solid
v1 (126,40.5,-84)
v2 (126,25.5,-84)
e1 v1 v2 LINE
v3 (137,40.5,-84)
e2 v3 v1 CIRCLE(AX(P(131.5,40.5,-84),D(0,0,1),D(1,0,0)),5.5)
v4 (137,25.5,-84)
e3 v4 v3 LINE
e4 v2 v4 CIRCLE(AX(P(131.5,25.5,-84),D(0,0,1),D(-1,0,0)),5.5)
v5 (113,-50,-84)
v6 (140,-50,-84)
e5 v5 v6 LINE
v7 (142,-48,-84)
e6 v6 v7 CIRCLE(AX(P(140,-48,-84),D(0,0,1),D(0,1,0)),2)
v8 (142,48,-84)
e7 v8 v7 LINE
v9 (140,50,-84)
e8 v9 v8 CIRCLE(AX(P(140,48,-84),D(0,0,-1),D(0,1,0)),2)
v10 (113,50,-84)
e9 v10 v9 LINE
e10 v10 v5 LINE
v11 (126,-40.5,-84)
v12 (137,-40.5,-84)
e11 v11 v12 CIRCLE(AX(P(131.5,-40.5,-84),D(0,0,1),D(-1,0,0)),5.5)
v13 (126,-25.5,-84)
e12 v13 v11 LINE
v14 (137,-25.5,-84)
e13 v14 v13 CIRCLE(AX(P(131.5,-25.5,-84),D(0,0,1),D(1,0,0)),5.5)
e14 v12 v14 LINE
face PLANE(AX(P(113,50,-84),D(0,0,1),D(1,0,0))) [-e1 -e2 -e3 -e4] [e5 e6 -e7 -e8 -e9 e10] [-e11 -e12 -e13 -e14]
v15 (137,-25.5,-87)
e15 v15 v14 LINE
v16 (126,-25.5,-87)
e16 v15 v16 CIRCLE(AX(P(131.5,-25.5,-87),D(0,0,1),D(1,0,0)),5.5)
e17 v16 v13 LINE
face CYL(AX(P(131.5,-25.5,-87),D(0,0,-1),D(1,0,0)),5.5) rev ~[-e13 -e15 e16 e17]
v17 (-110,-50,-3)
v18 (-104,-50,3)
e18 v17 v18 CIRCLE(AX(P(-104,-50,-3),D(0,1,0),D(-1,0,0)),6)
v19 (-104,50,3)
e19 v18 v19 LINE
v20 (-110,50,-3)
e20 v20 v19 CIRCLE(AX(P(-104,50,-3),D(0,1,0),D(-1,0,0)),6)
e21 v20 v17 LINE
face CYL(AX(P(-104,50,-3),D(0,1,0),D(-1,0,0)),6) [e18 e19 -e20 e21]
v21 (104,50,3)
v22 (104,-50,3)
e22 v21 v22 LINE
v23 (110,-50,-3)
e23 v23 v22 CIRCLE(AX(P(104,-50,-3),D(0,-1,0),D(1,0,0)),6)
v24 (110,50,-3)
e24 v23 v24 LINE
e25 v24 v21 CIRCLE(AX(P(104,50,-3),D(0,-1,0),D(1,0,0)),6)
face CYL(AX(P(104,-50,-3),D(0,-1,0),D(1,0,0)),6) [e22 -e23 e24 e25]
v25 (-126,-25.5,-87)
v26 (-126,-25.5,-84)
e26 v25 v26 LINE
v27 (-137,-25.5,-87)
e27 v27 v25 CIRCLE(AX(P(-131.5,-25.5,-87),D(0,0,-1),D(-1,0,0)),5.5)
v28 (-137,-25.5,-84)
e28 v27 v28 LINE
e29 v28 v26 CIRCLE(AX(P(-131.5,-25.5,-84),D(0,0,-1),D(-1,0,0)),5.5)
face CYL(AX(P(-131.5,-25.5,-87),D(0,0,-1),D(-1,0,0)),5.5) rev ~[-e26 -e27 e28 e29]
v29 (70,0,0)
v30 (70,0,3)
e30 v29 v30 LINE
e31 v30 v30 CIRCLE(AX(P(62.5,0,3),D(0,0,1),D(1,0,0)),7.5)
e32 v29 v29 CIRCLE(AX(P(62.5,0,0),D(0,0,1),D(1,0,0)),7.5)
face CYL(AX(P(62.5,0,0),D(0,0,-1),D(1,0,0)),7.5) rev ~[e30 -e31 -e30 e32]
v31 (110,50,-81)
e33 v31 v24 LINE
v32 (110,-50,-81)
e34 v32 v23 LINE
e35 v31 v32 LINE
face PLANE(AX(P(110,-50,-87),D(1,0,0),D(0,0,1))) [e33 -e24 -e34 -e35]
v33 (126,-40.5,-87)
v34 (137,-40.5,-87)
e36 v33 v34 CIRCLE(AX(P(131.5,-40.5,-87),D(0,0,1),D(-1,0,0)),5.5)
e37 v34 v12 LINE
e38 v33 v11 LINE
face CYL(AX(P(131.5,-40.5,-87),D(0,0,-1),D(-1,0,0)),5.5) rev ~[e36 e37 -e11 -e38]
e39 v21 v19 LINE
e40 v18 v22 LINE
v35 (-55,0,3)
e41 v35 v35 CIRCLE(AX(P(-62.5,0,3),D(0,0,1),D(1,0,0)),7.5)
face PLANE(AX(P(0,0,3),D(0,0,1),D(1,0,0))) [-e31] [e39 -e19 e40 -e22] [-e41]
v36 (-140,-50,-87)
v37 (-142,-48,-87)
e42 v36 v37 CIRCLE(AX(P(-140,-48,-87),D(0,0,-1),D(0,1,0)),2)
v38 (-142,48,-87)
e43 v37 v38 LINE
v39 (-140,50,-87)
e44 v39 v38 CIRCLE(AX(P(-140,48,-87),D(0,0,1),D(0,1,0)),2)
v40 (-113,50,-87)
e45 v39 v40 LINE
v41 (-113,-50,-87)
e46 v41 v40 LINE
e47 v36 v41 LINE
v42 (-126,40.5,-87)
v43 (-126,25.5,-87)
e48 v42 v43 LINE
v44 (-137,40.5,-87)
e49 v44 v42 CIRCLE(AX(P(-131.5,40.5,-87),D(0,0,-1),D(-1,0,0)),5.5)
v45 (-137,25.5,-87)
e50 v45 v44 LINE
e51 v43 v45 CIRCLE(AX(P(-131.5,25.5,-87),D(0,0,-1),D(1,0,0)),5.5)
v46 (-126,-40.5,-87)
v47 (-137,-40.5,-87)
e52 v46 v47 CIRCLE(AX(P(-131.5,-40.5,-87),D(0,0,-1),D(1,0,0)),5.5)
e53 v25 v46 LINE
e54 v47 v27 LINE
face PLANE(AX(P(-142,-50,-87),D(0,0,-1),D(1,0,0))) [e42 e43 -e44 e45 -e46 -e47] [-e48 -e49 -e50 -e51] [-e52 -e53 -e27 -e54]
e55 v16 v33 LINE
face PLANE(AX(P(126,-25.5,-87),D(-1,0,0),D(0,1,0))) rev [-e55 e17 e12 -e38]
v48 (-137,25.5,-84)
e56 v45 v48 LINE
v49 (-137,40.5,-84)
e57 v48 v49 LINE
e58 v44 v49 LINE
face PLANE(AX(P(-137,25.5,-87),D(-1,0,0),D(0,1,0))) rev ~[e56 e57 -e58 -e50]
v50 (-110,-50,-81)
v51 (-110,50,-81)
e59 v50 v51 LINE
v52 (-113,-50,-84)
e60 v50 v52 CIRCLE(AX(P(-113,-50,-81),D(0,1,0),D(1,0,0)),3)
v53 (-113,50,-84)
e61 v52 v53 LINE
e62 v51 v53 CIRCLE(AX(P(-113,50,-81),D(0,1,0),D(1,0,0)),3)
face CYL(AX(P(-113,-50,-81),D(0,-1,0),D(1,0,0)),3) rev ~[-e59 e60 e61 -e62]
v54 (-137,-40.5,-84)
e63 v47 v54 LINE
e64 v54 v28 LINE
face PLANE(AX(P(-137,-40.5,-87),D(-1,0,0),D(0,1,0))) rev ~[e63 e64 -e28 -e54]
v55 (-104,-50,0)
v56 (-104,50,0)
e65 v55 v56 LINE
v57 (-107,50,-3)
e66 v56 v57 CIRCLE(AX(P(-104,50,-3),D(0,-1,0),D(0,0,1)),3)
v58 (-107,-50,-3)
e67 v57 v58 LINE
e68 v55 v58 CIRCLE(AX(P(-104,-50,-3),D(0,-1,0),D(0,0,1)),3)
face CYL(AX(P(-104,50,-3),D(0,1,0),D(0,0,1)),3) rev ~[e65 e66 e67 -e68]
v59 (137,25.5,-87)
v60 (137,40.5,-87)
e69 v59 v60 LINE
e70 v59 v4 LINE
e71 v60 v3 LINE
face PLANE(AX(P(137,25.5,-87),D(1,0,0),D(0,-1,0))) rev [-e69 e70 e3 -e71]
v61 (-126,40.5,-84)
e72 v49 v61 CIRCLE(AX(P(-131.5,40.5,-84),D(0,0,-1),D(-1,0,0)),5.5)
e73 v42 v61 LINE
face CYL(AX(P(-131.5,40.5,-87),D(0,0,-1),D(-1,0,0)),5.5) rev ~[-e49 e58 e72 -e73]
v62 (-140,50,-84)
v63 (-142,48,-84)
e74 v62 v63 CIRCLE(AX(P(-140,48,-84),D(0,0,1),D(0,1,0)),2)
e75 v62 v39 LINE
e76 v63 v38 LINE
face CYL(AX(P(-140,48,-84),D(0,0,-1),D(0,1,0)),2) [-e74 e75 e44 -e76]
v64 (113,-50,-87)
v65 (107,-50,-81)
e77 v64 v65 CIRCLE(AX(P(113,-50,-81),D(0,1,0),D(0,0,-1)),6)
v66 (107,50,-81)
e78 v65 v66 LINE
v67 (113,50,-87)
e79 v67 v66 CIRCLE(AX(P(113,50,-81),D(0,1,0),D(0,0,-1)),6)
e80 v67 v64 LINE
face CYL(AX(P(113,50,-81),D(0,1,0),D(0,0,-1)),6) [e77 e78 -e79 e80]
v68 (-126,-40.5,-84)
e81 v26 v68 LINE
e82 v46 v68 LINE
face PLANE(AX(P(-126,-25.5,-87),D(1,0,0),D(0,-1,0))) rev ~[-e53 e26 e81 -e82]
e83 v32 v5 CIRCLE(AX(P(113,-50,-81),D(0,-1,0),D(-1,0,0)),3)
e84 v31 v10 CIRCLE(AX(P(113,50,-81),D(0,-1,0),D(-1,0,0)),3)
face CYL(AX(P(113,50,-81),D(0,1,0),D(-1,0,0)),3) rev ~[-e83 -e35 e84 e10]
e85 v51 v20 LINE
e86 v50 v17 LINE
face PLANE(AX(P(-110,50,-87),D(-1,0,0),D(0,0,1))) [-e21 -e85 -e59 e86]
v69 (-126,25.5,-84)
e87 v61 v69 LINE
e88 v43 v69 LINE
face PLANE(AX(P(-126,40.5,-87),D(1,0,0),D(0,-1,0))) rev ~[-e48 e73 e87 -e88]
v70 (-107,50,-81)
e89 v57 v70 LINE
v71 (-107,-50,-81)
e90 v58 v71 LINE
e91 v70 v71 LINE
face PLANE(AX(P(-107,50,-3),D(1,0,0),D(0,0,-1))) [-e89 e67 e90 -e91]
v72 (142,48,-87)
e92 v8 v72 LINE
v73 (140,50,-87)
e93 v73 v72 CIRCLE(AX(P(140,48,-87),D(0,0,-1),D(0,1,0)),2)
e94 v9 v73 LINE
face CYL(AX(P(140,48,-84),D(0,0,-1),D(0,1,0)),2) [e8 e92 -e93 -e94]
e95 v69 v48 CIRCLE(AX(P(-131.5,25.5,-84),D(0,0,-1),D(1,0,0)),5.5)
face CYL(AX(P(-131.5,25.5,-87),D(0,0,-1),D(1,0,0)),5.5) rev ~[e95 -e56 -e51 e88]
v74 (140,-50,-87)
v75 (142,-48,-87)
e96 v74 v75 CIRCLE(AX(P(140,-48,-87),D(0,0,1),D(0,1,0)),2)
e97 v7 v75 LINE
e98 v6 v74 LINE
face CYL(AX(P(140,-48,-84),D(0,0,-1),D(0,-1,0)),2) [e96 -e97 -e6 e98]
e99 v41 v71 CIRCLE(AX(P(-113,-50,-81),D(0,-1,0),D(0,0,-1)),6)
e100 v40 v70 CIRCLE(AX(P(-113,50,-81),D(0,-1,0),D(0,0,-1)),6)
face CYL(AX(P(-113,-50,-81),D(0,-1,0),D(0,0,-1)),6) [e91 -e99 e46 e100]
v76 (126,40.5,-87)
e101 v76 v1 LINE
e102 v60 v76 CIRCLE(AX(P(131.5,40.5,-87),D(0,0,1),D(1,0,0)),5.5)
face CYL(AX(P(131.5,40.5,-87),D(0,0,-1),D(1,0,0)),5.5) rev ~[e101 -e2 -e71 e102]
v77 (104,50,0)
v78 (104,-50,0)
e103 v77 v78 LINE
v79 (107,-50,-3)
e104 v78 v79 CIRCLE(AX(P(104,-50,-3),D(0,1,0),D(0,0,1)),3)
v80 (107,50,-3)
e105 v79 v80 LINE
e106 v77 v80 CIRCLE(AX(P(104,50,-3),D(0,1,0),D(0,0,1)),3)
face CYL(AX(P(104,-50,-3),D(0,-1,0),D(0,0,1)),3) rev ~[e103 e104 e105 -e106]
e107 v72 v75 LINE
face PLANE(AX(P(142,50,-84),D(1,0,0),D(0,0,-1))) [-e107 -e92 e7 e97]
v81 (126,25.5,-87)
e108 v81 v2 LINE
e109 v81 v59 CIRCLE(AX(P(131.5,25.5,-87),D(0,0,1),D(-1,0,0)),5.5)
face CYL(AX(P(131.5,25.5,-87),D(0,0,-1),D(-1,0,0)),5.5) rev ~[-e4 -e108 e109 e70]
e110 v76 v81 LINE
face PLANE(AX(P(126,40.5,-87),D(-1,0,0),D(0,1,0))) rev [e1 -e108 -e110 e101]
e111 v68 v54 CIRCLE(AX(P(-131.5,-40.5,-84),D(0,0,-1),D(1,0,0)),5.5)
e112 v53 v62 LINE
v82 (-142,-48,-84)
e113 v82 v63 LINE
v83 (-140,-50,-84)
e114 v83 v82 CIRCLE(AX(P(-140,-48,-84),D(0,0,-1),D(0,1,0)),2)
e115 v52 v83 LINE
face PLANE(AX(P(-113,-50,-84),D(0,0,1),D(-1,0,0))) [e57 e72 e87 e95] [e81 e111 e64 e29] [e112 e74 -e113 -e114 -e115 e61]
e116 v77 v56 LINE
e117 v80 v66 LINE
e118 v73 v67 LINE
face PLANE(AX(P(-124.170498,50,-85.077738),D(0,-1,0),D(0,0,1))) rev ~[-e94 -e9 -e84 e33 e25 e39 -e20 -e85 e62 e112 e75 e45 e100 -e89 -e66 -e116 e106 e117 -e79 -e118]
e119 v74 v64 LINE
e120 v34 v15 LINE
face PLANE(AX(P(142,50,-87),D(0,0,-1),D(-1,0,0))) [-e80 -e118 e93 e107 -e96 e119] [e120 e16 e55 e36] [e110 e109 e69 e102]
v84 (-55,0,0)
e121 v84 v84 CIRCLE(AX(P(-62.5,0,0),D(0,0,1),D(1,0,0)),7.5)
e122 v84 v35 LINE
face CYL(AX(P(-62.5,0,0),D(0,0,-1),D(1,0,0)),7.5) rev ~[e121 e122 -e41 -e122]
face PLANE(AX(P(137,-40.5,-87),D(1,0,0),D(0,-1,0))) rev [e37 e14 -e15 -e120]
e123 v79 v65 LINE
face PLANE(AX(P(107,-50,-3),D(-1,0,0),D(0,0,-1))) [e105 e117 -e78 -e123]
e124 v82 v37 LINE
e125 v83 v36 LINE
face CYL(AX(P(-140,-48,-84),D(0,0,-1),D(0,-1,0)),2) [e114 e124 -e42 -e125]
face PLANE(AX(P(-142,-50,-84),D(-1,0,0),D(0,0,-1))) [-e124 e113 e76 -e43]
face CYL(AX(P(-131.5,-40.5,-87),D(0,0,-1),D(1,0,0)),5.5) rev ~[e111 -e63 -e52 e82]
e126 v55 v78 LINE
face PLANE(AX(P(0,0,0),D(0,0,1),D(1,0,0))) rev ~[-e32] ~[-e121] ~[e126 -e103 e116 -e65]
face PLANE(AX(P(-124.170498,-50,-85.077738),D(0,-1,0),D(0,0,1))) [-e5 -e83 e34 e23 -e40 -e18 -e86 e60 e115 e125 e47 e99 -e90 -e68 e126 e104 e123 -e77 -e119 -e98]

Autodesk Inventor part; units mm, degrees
ref_plane "YZ Plane" through (0, 0, 0) normal (1, 0, 0) x (0, 1, 0)
ref_plane "XZ Plane" through (0, 0, 0) normal (0, 1, 0) x (-1, 0, 0)
ref_plane "XY Plane" through (0, 0, 0) normal (0, 0, 1) x (1, 0, 0)
sketch "Sketch1" plane through (0, 0, 0) normal (0, 0, 1) x (1, 0, 0)
  line L0 (-110, -50) -> (110, -50)
  line L1 (110, -50) -> (110, 50)
  line L2 (110, 50) -> (-110, 50)
  line L3 (-110, 50) -> (-110, -50)
  line L4 (-110, -50) -> (110, 50) construction
  circle A0 centre (-62.5, 0) radius 7.5
  circle A1 centre (62.5, 0) radius 7.5
  line L5 (0, 50) -> (0, -50) construction
  line L6 (-110, 0) -> (110, 0) construction
  line L7 (-70, 0) -> (-55, 0) construction
  point P0 (0, 0)
  dimension "d154" = 220
  dimension "d155" = 100
  dimension "d159" = 15
  dimension "d160" = 125
  dimension "d190" = 15
extrude "Plate5" add sketch "Sketch1" along normal blind 3
sketch "Sketch7" plane through (-107, 50, 3) normal (-1, 0, 0) x (0, -1, 0)
  line L0 (100, 0) -> (0, 0)
  line L1 (0, 0) -> (0, -90)
  line L2 (0, -90) -> (100, -90)
  line L3 (100, -90) -> (100, 0)
edge flange "Flange3" height 90 angle 90 thickness 3 bend radius 3 thickness toward (-1, 0, 0) relief tear relief width 3 relief depth 1.5 corner gap 3 corner form 0 edges at (-110, 0, 0) (110, 0, 0) wall of the first edge with corners at (-107, -50, 3) (-107, 50, 3) (-107, 50, -87) (-107, -50, -87)
bend "Bend3"
corner "Corner3"
sketch "Sketch8" plane through (-107, -50, -84) normal (0, 0, -1) x (-1, 0, 0)
  line L0 (0, 100) -> (0, 0)
  line L1 (0, 0) -> (35, 0)
  line L2 (35, 0) -> (35, 100)
  line L3 (35, 100) -> (0, 100)
edge flange "Flange4" height 35 angle 90 thickness 3 bend radius 3 thickness toward (0, 0, -1) relief tear relief width 3 relief depth 1.5 corner gap 3 corner form 0 edges at (-110, 0, -87) (110, 0, -87) wall of the first edge with corners at (-107, 50, -84) (-107, -50, -84) (-142, -50, -84) (-142, 50, -84)
bend "Bend4"
corner "Corner4"
sketch "Sketch9" plane through (-142, -50, -87) normal (0, 0, -1) x (-1, 0, 0)
  line L0 (-10.5, 9.5) -> (-10.5, 24.5) construction
  line L1 (-5, 9.5) -> (-5, 24.5)
  line L2 (-16, 24.5) -> (-16, 9.5)
  arc A0 (-16, 9.5) -> (-5, 9.5) centre (-10.5, 9.5) ccw
  arc A1 (-5, 24.5) -> (-16, 24.5) centre (-10.5, 24.5) ccw
  line L3 (-10.5, 75.5) -> (-10.5, 90.5) construction
  line L4 (-5, 75.5) -> (-5, 90.5)
  line L5 (-16, 90.5) -> (-16, 75.5)
  arc A2 (-16, 75.5) -> (-5, 75.5) centre (-10.5, 75.5) ccw
  arc A3 (-5, 90.5) -> (-16, 90.5) centre (-10.5, 90.5) ccw
  line L6 (0, 100) -> (0, 0) projected
  line L7 (0, 50) -> (-19.5858, 50)
  point P0 (-142, 50)
  point P1 (-10.5, 17)
  point P2 (-10.5, 83)
  point P3 (-10.5, 30)
  point P4 (-10.5, 70)
  dimension "d182" = 11
  dimension "d183" = 15
  dimension "d184" = 5
  dimension "d186" = 40
extrude "Cut1" cut sketch "Sketch9" against normal blind 3
mirror "Mirror1" about plane through (0, 0, 0) normal (1, 0, 0) of "Cut1"
fillet "Corner Round2" radius 2 4 edges at (-142, 50, -85.5) (-142, -50, -85.5) (142, -50, -85.5) (142, 50, -85.5)
properties part number "DMF Подставка ркдуктор_CPY"
